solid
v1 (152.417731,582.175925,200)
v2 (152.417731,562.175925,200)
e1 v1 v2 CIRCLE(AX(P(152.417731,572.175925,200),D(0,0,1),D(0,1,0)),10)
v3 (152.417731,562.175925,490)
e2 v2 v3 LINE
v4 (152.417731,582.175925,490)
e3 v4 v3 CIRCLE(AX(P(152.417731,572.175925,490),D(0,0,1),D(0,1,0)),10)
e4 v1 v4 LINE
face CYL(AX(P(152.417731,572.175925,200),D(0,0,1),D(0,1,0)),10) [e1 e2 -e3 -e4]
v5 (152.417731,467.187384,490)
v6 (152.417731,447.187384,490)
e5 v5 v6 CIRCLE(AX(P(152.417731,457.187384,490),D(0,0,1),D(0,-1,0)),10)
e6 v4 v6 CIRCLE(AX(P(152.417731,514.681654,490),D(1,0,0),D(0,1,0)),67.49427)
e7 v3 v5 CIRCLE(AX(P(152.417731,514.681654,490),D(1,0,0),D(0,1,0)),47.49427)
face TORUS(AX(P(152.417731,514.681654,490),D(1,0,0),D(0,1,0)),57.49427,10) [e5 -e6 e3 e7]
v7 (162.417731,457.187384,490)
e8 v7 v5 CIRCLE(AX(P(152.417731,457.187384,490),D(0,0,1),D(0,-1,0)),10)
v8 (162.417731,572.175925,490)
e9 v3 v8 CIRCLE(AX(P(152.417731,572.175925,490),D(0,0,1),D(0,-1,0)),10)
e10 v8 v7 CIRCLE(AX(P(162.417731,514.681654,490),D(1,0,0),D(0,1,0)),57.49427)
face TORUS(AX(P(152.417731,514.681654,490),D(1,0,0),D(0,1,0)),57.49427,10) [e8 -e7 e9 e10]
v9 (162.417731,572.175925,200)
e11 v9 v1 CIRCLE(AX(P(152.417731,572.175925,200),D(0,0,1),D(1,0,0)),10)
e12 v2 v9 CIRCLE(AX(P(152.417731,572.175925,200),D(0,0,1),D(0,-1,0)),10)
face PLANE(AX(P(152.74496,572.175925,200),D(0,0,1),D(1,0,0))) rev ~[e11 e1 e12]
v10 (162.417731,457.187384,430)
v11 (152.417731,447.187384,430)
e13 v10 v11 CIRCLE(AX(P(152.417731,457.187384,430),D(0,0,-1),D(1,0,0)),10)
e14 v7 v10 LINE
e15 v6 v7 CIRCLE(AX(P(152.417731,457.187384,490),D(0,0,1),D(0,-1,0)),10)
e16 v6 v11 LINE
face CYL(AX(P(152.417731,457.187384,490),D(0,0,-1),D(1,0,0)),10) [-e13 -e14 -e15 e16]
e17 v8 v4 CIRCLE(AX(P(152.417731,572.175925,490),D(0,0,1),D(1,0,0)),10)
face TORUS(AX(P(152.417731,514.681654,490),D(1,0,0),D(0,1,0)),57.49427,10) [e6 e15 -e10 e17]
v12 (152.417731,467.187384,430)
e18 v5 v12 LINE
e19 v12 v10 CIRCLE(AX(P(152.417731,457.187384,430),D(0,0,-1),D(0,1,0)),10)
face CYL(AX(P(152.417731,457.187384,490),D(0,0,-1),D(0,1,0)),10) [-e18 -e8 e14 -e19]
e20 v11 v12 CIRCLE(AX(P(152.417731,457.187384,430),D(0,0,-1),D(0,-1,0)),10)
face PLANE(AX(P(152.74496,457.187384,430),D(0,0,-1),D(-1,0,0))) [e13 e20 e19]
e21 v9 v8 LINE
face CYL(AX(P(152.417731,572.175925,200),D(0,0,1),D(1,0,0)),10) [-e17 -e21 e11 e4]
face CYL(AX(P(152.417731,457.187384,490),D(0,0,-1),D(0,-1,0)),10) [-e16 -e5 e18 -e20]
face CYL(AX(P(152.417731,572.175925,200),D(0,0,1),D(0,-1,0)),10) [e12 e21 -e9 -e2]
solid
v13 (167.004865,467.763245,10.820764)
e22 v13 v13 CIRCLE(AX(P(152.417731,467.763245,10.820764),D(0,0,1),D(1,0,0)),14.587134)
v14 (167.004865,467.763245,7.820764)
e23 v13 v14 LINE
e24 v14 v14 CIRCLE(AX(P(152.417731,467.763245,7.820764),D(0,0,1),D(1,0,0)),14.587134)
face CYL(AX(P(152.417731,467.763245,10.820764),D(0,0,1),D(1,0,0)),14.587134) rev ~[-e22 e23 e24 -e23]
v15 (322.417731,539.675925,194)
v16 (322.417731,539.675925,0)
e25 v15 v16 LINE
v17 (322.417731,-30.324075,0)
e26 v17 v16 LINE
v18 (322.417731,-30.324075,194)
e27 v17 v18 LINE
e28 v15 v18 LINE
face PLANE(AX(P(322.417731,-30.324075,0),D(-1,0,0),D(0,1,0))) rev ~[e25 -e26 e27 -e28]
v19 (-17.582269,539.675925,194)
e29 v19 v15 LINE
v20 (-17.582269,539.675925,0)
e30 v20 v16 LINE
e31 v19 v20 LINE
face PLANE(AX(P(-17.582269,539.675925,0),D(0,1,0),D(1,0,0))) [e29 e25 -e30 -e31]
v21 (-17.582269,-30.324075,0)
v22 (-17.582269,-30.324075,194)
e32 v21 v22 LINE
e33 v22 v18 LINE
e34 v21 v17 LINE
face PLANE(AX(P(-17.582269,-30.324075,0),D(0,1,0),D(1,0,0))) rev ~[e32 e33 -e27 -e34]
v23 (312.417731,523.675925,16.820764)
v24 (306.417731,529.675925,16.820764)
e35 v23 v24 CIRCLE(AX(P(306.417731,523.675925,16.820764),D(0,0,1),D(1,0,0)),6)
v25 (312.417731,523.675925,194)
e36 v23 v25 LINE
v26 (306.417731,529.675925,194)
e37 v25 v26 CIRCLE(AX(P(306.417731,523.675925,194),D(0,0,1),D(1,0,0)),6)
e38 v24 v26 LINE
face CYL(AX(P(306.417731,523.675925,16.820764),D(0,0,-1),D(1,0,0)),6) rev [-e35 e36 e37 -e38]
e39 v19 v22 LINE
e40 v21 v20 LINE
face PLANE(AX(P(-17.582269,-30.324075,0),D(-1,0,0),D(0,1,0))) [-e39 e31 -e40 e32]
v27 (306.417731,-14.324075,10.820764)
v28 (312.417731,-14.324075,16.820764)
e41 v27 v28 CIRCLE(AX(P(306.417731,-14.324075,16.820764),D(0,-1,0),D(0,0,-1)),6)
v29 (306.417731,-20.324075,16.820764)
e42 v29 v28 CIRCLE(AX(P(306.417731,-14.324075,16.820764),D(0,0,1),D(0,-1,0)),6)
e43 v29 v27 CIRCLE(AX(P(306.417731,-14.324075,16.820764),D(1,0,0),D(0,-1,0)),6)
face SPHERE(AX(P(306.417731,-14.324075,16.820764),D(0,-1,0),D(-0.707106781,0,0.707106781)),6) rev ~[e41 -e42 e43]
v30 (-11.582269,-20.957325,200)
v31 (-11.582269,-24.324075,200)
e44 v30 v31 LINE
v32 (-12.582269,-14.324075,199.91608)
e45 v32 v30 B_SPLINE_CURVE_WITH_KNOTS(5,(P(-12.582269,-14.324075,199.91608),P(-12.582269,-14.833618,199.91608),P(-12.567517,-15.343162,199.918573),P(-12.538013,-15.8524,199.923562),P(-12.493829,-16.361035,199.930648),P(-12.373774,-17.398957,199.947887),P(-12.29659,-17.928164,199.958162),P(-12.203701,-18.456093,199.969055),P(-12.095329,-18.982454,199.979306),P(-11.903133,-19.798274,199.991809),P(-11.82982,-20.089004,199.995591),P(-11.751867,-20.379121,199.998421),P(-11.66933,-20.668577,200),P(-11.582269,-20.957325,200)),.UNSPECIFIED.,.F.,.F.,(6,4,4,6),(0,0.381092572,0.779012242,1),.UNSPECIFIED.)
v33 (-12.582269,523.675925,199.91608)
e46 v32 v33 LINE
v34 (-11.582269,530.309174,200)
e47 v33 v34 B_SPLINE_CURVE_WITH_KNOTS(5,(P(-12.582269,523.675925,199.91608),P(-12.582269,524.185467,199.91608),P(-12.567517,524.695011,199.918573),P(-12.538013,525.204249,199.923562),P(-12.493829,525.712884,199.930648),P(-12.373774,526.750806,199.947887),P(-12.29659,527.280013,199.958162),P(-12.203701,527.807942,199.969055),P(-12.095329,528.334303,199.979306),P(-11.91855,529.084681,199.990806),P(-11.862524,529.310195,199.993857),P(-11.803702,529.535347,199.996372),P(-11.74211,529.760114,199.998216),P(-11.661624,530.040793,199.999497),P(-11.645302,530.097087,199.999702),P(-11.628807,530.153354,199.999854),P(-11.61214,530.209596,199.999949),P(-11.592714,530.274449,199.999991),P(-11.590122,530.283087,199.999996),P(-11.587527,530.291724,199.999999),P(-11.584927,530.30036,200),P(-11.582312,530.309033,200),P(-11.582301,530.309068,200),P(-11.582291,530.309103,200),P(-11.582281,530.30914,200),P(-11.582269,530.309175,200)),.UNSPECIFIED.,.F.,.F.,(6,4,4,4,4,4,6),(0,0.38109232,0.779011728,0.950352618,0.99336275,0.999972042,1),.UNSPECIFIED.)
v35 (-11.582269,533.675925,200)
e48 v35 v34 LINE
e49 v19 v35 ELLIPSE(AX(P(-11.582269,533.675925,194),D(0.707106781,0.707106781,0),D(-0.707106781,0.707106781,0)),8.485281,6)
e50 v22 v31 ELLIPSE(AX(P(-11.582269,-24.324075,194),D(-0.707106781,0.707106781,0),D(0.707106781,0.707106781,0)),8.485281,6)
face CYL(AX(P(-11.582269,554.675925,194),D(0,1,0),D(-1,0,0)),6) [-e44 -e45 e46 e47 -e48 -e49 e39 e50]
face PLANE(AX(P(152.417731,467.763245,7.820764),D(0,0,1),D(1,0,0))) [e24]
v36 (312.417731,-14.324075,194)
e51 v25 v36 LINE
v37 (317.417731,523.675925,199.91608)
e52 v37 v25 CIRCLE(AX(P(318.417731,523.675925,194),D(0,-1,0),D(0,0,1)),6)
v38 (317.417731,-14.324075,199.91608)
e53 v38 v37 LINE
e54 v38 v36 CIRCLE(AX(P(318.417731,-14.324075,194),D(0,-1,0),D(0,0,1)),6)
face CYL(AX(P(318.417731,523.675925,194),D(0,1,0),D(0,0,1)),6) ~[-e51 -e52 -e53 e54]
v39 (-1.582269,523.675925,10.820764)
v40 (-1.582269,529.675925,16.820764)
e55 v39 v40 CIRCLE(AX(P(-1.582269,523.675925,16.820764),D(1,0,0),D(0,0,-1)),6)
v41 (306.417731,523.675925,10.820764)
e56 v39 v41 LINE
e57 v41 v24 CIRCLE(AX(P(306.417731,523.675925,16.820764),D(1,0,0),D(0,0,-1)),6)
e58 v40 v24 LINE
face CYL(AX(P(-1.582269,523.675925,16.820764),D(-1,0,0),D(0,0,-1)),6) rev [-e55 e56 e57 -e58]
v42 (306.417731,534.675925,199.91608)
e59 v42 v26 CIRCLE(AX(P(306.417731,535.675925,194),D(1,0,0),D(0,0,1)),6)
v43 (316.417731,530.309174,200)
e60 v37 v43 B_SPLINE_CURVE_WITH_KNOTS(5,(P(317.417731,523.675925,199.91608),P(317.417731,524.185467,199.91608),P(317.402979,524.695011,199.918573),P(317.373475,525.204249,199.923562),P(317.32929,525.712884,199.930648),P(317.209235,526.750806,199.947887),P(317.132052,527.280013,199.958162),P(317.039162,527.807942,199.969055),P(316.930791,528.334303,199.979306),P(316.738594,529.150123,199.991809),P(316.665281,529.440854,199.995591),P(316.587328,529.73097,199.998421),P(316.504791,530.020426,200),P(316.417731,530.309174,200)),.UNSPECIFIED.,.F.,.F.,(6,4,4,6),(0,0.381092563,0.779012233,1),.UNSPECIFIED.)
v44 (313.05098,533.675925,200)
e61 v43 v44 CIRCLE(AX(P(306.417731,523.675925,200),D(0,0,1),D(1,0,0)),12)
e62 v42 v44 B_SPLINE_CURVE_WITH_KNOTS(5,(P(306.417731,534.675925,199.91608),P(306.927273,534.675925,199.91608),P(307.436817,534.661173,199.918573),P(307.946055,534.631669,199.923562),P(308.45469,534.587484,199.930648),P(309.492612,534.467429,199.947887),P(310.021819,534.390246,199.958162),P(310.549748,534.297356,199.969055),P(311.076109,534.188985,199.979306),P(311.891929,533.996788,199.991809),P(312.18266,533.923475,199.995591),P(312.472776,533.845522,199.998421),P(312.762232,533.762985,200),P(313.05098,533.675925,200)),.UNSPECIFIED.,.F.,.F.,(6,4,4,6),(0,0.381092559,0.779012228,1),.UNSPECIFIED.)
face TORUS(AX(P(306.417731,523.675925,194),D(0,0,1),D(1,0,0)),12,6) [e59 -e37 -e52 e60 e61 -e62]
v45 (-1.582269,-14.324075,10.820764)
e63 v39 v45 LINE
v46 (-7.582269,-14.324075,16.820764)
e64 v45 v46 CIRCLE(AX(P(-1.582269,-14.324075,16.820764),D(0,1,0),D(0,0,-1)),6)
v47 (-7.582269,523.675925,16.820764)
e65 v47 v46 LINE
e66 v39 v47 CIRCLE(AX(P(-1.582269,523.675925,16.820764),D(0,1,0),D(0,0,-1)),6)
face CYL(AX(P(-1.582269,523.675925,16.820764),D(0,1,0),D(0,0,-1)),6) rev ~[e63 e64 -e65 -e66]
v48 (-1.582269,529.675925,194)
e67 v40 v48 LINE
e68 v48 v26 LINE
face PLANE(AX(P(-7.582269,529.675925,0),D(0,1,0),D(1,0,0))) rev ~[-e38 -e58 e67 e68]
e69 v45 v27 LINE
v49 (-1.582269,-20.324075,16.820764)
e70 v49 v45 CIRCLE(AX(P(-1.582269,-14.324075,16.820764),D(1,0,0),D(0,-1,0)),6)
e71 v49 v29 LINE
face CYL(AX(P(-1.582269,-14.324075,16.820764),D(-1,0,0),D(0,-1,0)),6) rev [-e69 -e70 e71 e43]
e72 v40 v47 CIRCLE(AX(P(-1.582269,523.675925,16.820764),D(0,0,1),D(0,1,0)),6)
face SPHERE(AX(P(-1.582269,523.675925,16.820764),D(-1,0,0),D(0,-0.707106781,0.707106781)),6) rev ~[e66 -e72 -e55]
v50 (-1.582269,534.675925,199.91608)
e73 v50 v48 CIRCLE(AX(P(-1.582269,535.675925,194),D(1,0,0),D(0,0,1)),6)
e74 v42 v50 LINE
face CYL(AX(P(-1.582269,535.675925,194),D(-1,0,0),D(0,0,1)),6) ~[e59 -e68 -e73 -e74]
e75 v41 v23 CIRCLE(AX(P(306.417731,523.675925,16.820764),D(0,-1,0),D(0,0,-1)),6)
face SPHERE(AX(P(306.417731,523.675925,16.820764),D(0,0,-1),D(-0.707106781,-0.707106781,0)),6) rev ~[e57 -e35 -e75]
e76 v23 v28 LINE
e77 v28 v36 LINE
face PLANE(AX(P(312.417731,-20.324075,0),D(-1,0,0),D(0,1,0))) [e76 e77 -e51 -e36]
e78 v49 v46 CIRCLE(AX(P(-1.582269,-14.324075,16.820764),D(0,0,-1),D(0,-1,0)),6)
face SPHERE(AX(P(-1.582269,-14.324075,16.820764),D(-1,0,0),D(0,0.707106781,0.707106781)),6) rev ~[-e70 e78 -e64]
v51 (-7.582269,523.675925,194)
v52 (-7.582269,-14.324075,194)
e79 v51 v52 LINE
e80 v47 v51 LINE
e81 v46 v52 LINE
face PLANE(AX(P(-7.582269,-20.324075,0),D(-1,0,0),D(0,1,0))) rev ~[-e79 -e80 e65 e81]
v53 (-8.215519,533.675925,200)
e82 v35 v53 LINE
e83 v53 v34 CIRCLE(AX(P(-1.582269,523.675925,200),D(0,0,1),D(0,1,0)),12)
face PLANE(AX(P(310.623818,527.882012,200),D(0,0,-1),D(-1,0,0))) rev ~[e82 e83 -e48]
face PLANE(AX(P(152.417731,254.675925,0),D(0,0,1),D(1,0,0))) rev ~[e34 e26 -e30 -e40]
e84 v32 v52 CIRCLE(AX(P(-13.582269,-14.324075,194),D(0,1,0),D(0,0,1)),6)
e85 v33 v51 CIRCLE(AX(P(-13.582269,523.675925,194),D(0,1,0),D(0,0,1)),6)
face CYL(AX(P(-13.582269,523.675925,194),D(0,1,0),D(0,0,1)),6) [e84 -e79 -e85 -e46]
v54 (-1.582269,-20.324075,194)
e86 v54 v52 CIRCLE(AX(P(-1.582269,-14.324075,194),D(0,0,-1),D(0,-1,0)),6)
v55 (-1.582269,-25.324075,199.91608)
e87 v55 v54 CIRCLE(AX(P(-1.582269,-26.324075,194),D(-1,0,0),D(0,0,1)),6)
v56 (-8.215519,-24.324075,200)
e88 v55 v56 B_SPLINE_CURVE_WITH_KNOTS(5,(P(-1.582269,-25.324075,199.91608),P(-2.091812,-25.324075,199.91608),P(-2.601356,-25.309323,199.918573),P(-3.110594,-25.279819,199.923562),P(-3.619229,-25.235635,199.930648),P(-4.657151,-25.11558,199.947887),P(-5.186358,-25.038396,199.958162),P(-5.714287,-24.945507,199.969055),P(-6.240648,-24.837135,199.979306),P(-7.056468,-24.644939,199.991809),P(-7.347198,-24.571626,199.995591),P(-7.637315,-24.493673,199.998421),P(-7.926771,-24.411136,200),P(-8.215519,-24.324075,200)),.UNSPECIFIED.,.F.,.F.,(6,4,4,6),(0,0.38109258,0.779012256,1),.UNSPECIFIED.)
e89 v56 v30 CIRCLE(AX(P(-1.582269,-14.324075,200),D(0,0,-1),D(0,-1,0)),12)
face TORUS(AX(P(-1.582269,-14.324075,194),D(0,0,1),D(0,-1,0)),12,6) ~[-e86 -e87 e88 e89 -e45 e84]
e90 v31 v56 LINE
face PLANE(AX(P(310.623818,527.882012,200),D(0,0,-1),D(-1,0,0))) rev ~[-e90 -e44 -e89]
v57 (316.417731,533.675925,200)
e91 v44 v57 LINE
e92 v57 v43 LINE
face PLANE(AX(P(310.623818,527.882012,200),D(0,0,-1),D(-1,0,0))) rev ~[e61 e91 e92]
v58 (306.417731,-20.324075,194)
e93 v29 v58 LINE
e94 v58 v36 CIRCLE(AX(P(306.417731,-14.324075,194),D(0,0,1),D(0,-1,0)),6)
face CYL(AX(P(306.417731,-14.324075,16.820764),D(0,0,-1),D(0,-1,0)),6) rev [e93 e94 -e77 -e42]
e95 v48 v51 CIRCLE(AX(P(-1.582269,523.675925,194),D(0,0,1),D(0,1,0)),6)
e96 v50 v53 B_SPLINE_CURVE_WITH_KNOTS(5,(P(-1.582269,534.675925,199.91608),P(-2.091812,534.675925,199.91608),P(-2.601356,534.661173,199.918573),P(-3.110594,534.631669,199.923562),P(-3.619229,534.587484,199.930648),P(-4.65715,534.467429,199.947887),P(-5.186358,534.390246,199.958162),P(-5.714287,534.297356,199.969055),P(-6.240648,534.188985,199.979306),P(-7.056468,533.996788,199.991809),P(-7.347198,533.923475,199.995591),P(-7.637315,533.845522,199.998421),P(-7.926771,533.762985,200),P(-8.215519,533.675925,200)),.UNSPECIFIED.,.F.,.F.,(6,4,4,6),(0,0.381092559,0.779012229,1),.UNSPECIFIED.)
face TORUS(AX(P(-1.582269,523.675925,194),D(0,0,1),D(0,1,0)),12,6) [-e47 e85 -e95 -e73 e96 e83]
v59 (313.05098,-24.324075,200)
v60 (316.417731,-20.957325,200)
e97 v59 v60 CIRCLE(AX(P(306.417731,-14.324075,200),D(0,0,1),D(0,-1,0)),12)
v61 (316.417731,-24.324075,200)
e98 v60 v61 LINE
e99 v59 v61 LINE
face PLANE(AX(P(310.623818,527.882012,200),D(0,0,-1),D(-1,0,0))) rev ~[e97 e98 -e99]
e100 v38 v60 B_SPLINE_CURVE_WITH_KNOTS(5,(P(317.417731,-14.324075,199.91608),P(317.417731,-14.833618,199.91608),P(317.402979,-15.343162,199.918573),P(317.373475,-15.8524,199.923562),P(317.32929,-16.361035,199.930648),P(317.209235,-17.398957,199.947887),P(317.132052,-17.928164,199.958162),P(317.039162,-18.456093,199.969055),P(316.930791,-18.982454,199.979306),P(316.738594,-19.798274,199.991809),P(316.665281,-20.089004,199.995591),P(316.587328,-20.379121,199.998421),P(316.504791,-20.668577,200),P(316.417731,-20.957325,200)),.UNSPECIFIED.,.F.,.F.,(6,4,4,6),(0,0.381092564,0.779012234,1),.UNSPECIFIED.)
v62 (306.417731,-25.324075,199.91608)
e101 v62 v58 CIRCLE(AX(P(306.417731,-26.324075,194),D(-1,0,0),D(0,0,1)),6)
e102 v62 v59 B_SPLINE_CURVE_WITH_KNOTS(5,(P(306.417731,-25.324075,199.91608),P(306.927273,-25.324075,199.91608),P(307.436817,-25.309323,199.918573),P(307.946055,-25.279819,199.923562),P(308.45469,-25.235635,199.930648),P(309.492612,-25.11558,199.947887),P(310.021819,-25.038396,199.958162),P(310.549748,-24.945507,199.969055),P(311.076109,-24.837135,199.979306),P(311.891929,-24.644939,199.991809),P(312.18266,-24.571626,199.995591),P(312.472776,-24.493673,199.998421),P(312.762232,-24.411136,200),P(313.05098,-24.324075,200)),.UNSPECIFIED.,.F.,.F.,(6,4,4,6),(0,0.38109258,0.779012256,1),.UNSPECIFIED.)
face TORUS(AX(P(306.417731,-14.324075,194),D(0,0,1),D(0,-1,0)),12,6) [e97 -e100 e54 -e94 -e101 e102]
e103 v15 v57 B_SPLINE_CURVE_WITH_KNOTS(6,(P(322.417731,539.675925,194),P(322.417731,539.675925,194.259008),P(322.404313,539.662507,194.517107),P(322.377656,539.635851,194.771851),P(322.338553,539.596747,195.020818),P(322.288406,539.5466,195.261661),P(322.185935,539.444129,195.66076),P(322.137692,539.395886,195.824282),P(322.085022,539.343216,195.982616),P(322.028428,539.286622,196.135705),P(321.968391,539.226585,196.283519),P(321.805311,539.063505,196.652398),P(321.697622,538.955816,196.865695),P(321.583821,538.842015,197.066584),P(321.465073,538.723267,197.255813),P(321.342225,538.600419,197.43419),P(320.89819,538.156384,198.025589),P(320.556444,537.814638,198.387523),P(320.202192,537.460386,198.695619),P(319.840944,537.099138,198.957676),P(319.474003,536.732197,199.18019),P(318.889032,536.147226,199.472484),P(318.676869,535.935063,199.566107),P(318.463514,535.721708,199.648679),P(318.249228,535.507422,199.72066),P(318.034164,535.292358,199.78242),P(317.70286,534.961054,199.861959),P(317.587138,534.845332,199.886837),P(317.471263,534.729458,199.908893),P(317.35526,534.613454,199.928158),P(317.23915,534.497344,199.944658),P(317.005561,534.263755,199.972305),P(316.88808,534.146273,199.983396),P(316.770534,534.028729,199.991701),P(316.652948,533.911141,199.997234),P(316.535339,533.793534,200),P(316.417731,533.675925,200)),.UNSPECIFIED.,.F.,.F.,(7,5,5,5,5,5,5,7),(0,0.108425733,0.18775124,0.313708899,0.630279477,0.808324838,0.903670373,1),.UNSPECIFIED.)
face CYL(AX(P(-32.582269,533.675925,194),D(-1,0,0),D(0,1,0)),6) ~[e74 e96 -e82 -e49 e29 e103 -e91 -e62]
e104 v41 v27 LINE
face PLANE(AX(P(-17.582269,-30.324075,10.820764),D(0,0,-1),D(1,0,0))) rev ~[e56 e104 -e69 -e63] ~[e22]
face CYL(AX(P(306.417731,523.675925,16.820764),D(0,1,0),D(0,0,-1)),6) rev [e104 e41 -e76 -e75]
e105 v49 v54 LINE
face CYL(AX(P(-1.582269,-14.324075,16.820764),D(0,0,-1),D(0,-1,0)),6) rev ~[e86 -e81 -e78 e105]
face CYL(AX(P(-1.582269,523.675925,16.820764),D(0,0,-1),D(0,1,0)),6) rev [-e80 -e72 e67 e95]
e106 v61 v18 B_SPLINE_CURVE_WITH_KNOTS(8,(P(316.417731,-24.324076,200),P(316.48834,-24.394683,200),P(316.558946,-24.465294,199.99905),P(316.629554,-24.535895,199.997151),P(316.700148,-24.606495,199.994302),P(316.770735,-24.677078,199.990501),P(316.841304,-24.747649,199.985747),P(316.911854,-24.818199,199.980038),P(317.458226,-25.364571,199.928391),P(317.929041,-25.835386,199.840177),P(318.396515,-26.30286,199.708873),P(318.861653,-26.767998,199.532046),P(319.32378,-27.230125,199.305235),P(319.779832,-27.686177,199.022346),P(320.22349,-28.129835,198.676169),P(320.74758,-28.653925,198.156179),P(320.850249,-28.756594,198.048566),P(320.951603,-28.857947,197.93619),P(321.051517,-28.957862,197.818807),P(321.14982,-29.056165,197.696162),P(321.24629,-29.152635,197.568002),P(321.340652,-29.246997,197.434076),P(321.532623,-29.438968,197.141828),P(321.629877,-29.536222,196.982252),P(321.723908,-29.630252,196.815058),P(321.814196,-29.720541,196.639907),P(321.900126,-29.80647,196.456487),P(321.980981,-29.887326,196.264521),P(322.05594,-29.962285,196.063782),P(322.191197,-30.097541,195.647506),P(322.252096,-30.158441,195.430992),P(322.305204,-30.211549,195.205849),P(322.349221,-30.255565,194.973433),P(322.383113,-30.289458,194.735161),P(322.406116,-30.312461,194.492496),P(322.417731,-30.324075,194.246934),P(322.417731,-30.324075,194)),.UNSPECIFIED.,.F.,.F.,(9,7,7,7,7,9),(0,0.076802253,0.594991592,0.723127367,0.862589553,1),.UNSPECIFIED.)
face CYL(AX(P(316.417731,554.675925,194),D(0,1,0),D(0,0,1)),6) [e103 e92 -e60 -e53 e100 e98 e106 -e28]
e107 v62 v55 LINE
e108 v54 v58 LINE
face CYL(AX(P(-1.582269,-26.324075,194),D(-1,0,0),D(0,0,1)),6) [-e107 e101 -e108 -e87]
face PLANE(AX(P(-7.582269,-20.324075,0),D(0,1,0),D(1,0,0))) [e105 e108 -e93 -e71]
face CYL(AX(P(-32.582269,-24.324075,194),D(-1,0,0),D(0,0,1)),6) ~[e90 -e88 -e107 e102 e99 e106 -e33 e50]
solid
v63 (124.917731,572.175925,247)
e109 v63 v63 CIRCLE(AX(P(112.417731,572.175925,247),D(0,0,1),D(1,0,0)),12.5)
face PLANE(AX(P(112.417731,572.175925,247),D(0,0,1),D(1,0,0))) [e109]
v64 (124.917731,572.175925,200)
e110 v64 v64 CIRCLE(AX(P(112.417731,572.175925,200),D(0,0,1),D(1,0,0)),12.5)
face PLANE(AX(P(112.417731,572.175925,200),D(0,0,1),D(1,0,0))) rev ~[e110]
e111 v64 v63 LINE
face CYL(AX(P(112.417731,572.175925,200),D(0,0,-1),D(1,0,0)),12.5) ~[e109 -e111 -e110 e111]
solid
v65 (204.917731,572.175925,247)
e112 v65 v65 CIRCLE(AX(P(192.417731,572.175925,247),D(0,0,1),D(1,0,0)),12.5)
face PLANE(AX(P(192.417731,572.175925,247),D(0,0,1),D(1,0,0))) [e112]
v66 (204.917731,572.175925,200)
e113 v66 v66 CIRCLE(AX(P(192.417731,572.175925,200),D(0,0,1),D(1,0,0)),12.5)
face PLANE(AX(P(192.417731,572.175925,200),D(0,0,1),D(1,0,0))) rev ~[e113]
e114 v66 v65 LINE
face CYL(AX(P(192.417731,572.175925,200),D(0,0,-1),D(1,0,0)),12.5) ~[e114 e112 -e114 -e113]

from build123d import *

# Parameters (mm, degrees)
F0_W         = 340
F0_H         = 570
F0_W_2       = 320
F0_H_2       = 550
F1_DEPTH     = 200
F2_W         = 340
F2_H         = 10.8207641169
F3_DEPTH     = 570
F4_T1_DEPTH  = 538
F4_T3_DEPTH  = 308
F4_T5_DEPTH  = 183.1792358831
F4_S9_W      = 6.12
F4_S9_H      = 6.12
F4_T10_DEPTH = 6.12
F4_S15_W     = 6.12
F4_S15_H     = 6.12
F4_T16_DEPTH = 6.12
F4_S21_W     = 6.12
F4_S21_H     = 6.12
F4_T22_DEPTH = 6.12
F4_S27_W     = 6.12
F4_S27_H     = 6.12
F4_T28_DEPTH = 6.12
F4_T31_DEPTH = 600
F4_T33_DEPTH = 370
F4_T35_DEPTH = 538
F4_T37_DEPTH = 308
F4_T40_ANGLE = 90
F4_T42_ANGLE = 90
F4_T44_ANGLE = 90
F4_T46_ANGLE = 90
F5_R         = 14.5871340725
F6_DEPTH     = 3
F12_R        = 12.5
F13_DEPTH    = 47


# Not quite as in the source:
# - a fillet or chamfer that OpenCascade refuses, or shapes differently, is made with other operations: its cross-section is extruded or revolved along the edge and cut away or added


with BuildPart() as f1:
    # F0 (on Top) → F1 (new body)
    with BuildSketch(Plane.XY):
        with Locations((152.4177306145, 254.675924629)):
            Rectangle(F0_W, F0_H)
        with Locations((152.4177306145, 254.675924629)):
            Rectangle(F0_W_2, F0_H_2, mode=Mode.SUBTRACT)
    extrude(amount=F1_DEPTH)

    # F2 (on face) → F3 (join, through all)
    with BuildSketch(Plane.XZ.offset(30.324075371)):
        with Locations((152.4177306145, 5.4103820585)):
            Rectangle(F2_W, F2_H)
    extrude(amount=-F3_DEPTH)

    # F4: fillet of radius 6 on 16 edges, made by hand

    # F4_s2 → F4_t1 (join)
    with BuildSketch(Plane.XZ.offset(-523.675924629)):
        with BuildLine():
            ThreePointArc((-1.5822693855, 10.8207641169), (-5.8249100726, 12.5781234298), (-7.5822693855, 16.8207641169))
            Line((-7.5822693855, 16.8207641169), (-7.7022693855, 16.8207641169))
            Line((-7.7022693855, 16.8207641169), (-7.7022693855, 10.7007641169))
            Line((-7.7022693855, 10.7007641169), (-1.5822693855, 10.7007641169))
            Line((-1.5822693855, 10.7007641169), (-1.5822693855, 10.8207641169))
        make_face()
        with BuildLine():
            ThreePointArc((306.4177306145, 10.8207641169), (310.6603713017, 12.5781234298), (312.4177306145, 16.8207641169))
            Line((312.4177306145, 16.8207641169), (312.5377306145, 16.8207641169))
            Line((312.5377306145, 16.8207641169), (312.5377306145, 10.7007641169))
            Line((312.5377306145, 10.7007641169), (306.4177306145, 10.7007641169))
            Line((306.4177306145, 10.7007641169), (306.4177306145, 10.8207641169))
        make_face()
    extrude(amount=F4_T1_DEPTH)

    # F4_s4 → F4_t3 (join)
    with BuildSketch(Plane.YZ.offset(-1.5822693855)):
        with BuildLine():
            ThreePointArc((523.675924629, 10.8207641169), (527.9185653161, 12.5781234298), (529.675924629, 16.8207641169))
            Line((529.675924629, 16.8207641169), (529.795924629, 16.8207641169))
            Line((529.795924629, 16.8207641169), (529.795924629, 10.7007641169))
            Line((529.795924629, 10.7007641169), (523.675924629, 10.7007641169))
            Line((523.675924629, 10.7007641169), (523.675924629, 10.8207641169))
        make_face()
        with BuildLine():
            ThreePointArc((-20.324075371, 16.8207641169), (-18.5667160581, 12.5781234298), (-14.324075371, 10.8207641169))
            Line((-14.324075371, 10.8207641169), (-14.324075371, 10.7007641169))
            Line((-14.324075371, 10.7007641169), (-20.444075371, 10.7007641169))
            Line((-20.444075371, 10.7007641169), (-20.444075371, 16.8207641169))
            Line((-20.444075371, 16.8207641169), (-20.324075371, 16.8207641169))
        make_face()
    extrude(amount=F4_T3_DEPTH)

    # F4_s6 → F4_t5 (join)
    with BuildSketch(Plane.XY.offset(16.8207641169)):
        with BuildLine():
            ThreePointArc((312.4177306145, 523.675924629), (310.6603713017, 527.9185653161), (306.4177306145, 529.675924629))
            Line((306.4177306145, 529.675924629), (306.4177306145, 529.795924629))
            Line((306.4177306145, 529.795924629), (312.5377306145, 529.795924629))
            Line((312.5377306145, 529.795924629), (312.5377306145, 523.675924629))
            Line((312.5377306145, 523.675924629), (312.4177306145, 523.675924629))
        make_face()
        with BuildLine():
            ThreePointArc((-1.5822693855, 529.675924629), (-5.8249100726, 527.9185653161), (-7.5822693855, 523.675924629))
            Line((-7.5822693855, 523.675924629), (-7.7022693855, 523.675924629))
            Line((-7.7022693855, 523.675924629), (-7.7022693855, 529.795924629))
            Line((-7.7022693855, 529.795924629), (-1.5822693855, 529.795924629))
            Line((-1.5822693855, 529.795924629), (-1.5822693855, 529.675924629))
        make_face()
        with BuildLine():
            ThreePointArc((-1.5822693855, -20.324075371), (-5.8249100726, -18.5667160581), (-7.5822693855, -14.324075371))
            Line((-7.5822693855, -14.324075371), (-7.7022693855, -14.324075371))
            Line((-7.7022693855, -14.324075371), (-7.7022693855, -20.444075371))
            Line((-7.7022693855, -20.444075371), (-1.5822693855, -20.444075371))
            Line((-1.5822693855, -20.444075371), (-1.5822693855, -20.324075371))
        make_face()
        with BuildLine():
            ThreePointArc((306.4177306145, -20.324075371), (310.6603713017, -18.5667160581), (312.4177306145, -14.324075371))
            Line((312.4177306145, -14.324075371), (312.5377306145, -14.324075371))
            Line((312.5377306145, -14.324075371), (312.5377306145, -20.444075371))
            Line((312.5377306145, -20.444075371), (306.4177306145, -20.444075371))
            Line((306.4177306145, -20.444075371), (306.4177306145, -20.324075371))
        make_face()
    extrude(amount=F4_T5_DEPTH)


with BuildPart() as f4_tool8:
    # F4_s9 → F4_t10 (new body)
    with BuildSketch(Plane.YZ.offset(-1.5822693855)):
        with Locations((-17.384075371, 13.7607641169)):
            Rectangle(F4_S9_W, F4_S9_H)
    extrude(amount=-F4_T10_DEPTH)

    # F4_s11 → F4_t12 (revolve, cut)
    with BuildSketch(Plane(origin=(-1.5822693855, -14.324075371, 16.8207641169), x_dir=(0, 0.7071067812, 0.7071067812), z_dir=(0, -0.7071067812, 0.7071067812))):
        with BuildLine():
            ThreePointArc((0, -6), (6, 0), (0, 6))
            Line((0, 6), (0, -6))
        make_face()
    revolve(axis=Axis((-1.5822693855, -14.324075371, 16.8207641169), (-1, 0, 0)), mode=Mode.SUBTRACT)


with BuildPart() as f1_1:
    add(f1.part)

    # F4_t7: union F4_tool8
    add(f4_tool8.part)


with BuildPart() as f4_tool14:
    # F4_s15 → F4_t16 (new body)
    with BuildSketch(Plane.YZ.offset(-1.5822693855)):
        with Locations((526.735924629, 13.7607641169)):
            Rectangle(F4_S15_W, F4_S15_H)
    extrude(amount=-F4_T16_DEPTH)

    # F4_s17 → F4_t18 (revolve, cut)
    with BuildSketch(Plane(origin=(-1.5822693855, 523.675924629, 16.8207641169), x_dir=(0, -0.7071067812, 0.7071067812), z_dir=(0, -0.7071067812, -0.7071067812))):
        with BuildLine():
            ThreePointArc((0, -6), (6, 0), (0, 6))
            Line((0, 6), (0, -6))
        make_face()
    revolve(axis=Axis((-1.5822693855, 523.675924629, 16.8207641169), (-1, 0, 0)), mode=Mode.SUBTRACT)


with BuildPart() as f1_2:
    add(f1_1.part)

    # F4_t13: union F4_tool14
    add(f4_tool14.part)


with BuildPart() as f4_tool20:
    # F4_s21 → F4_t22 (new body)
    with BuildSketch(Plane.XY.offset(16.8207641169)):
        with Locations((309.4777306145, 526.735924629)):
            Rectangle(F4_S21_W, F4_S21_H)
    extrude(amount=-F4_T22_DEPTH)

    # F4_s23 → F4_t24 (revolve, cut)
    with BuildSketch(Plane(origin=(306.4177306145, 523.675924629, 16.8207641169), x_dir=(-0.7071067812, -0.7071067812, 0), z_dir=(0.7071067812, -0.7071067812, 0))):
        with BuildLine():
            ThreePointArc((0, -6), (6, 0), (0, 6))
            Line((0, 6), (0, -6))
        make_face()
    revolve(axis=Axis((306.4177306145, 523.675924629, 16.8207641169), (0, 0, -1)), mode=Mode.SUBTRACT)


with BuildPart() as f1_3:
    add(f1_2.part)

    # F4_t19: union F4_tool20
    add(f4_tool20.part)


with BuildPart() as f4_tool26:
    # F4_s27 → F4_t28 (new body)
    with BuildSketch(Plane.XZ.offset(14.324075371)):
        with Locations((309.4777306145, 13.7607641169)):
            Rectangle(F4_S27_W, F4_S27_H)
    extrude(amount=F4_T28_DEPTH)

    # F4_s29 → F4_t30 (revolve, cut)
    with BuildSketch(Plane(origin=(306.4177306145, -14.324075371, 16.8207641169), x_dir=(-0.7071067812, 0, 0.7071067812), z_dir=(0.7071067812, 0, 0.7071067812))):
        with BuildLine():
            ThreePointArc((0, -6), (6, 0), (0, 6))
            Line((0, 6), (0, -6))
        make_face()
    revolve(axis=Axis((306.4177306145, -14.324075371, 16.8207641169), (0, -1, 0)), mode=Mode.SUBTRACT)


with BuildPart() as f1_4:
    add(f1_3.part)

    # F4_t25: union F4_tool26
    add(f4_tool26.part)

    # F4_s32 → F4_t31 (cut)
    with BuildSketch(Plane.XZ.offset(-554.675924629)):
        with BuildLine():
            ThreePointArc((-17.5822693855, 194), (-15.8249100726, 198.2426406871), (-11.5822693855, 200))
            Line((-11.5822693855, 200), (-11.5822693855, 200.12))
            Line((-11.5822693855, 200.12), (-17.7022693855, 200.12))
            Line((-17.7022693855, 200.12), (-17.7022693855, 194))
            Line((-17.7022693855, 194), (-17.5822693855, 194))
        make_face()
        with BuildLine():
            ThreePointArc((316.4177306145, 200), (320.6603713017, 198.2426406871), (322.4177306145, 194))
            Line((322.4177306145, 194), (322.5377306145, 194))
            Line((322.5377306145, 194), (322.5377306145, 200.12))
            Line((322.5377306145, 200.12), (316.4177306145, 200.12))
            Line((316.4177306145, 200.12), (316.4177306145, 200))
        make_face()
    extrude(amount=F4_T31_DEPTH, mode=Mode.SUBTRACT)

    # F4_s34 → F4_t33 (cut)
    with BuildSketch(Plane.YZ.offset(-32.5822693855)):
        with BuildLine():
            ThreePointArc((-24.324075371, 200), (-28.5667160581, 198.2426406871), (-30.324075371, 194))
            Line((-30.324075371, 194), (-30.444075371, 194))
            Line((-30.444075371, 194), (-30.444075371, 200.12))
            Line((-30.444075371, 200.12), (-24.324075371, 200.12))
            Line((-24.324075371, 200.12), (-24.324075371, 200))
        make_face()
        with BuildLine():
            ThreePointArc((539.675924629, 194), (537.9185653161, 198.2426406871), (533.675924629, 200))
            Line((533.675924629, 200), (533.675924629, 200.12))
            Line((533.675924629, 200.12), (539.795924629, 200.12))
            Line((539.795924629, 200.12), (539.795924629, 194))
            Line((539.795924629, 194), (539.675924629, 194))
        make_face()
    extrude(amount=F4_T33_DEPTH, mode=Mode.SUBTRACT)

    # F4_s36 → F4_t35 (cut)
    with BuildSketch(Plane.XZ.offset(-523.675924629)):
        with BuildLine():
            ThreePointArc((-13.5822693855, 200), (-9.3396286983, 198.2426406871), (-7.5822693855, 194))
            Line((-7.5822693855, 194), (-7.4622693855, 194))
            Line((-7.4622693855, 194), (-7.4622693855, 200.12))
            Line((-7.4622693855, 200.12), (-13.5822693855, 200.12))
            Line((-13.5822693855, 200.12), (-13.5822693855, 200))
        make_face()
        with BuildLine():
            ThreePointArc((318.4177306145, 200), (314.1750899274, 198.2426406871), (312.4177306145, 194))
            Line((312.4177306145, 194), (312.2977306145, 194))
            Line((312.2977306145, 194), (312.2977306145, 200.12))
            Line((312.2977306145, 200.12), (318.4177306145, 200.12))
            Line((318.4177306145, 200.12), (318.4177306145, 200))
        make_face()
    extrude(amount=F4_T35_DEPTH, mode=Mode.SUBTRACT)

    # F4_s38 → F4_t37 (cut)
    with BuildSketch(Plane.YZ.offset(-1.5822693855)):
        with BuildLine():
            ThreePointArc((535.675924629, 200), (531.4332839419, 198.2426406871), (529.675924629, 194))
            Line((529.675924629, 194), (529.555924629, 194))
            Line((529.555924629, 194), (529.555924629, 200.12))
            Line((529.555924629, 200.12), (535.675924629, 200.12))
            Line((535.675924629, 200.12), (535.675924629, 200))
        make_face()
        with BuildLine():
            ThreePointArc((-26.324075371, 200), (-22.0814346839, 198.2426406871), (-20.324075371, 194))
            Line((-20.324075371, 194), (-20.204075371, 194))
            Line((-20.204075371, 194), (-20.204075371, 200.12))
            Line((-20.204075371, 200.12), (-26.324075371, 200.12))
            Line((-26.324075371, 200.12), (-26.324075371, 200))
        make_face()
    extrude(amount=F4_T37_DEPTH, mode=Mode.SUBTRACT)

    # F4_s39 → F4_t40 (revolve, cut)
    with BuildSketch(Plane.YZ.offset(306.4177306145)):
        with BuildLine():
            ThreePointArc((-26.324075371, 200), (-22.0814346839, 198.2426406871), (-20.324075371, 194))
            Line((-20.324075371, 194), (-20.204075371, 194))
            Line((-20.204075371, 194), (-20.204075371, 200.12))
            Line((-20.204075371, 200.12), (-26.324075371, 200.12))
            Line((-26.324075371, 200.12), (-26.324075371, 200))
        make_face()
    revolve(axis=Axis((306.4177306145, -14.324075371, 200), (0, 0, 1)), revolution_arc=F4_T40_ANGLE, mode=Mode.SUBTRACT)

    # F4_s41 → F4_t42 (revolve, cut)
    with BuildSketch(Plane.YZ.offset(-1.5822693855)):
        with BuildLine():
            ThreePointArc((-26.324075371, 200), (-22.0814346839, 198.2426406871), (-20.324075371, 194))
            Line((-20.324075371, 194), (-20.204075371, 194))
            Line((-20.204075371, 194), (-20.204075371, 200.12))
            Line((-20.204075371, 200.12), (-26.324075371, 200.12))
            Line((-26.324075371, 200.12), (-26.324075371, 200))
        make_face()
    revolve(axis=Axis((-1.5822693855, -14.324075371, 200), (0, 0, -1)), revolution_arc=F4_T42_ANGLE, mode=Mode.SUBTRACT)

    # F4_s43 → F4_t44 (revolve, cut)
    with BuildSketch(Plane.XZ.offset(-523.675924629)):
        with BuildLine():
            ThreePointArc((318.4177306145, 200), (314.1750899274, 198.2426406871), (312.4177306145, 194))
            Line((312.4177306145, 194), (312.2977306145, 194))
            Line((312.2977306145, 194), (312.2977306145, 200.12))
            Line((312.2977306145, 200.12), (318.4177306145, 200.12))
            Line((318.4177306145, 200.12), (318.4177306145, 200))
        make_face()
    revolve(axis=Axis((306.4177306145, 523.675924629, 200), (0, 0, 1)), revolution_arc=F4_T44_ANGLE, mode=Mode.SUBTRACT)

    # F4_s45 → F4_t46 (revolve, cut)
    with BuildSketch(Plane.YZ.offset(-1.5822693855)):
        with BuildLine():
            ThreePointArc((535.675924629, 200), (531.4332839419, 198.2426406871), (529.675924629, 194))
            Line((529.675924629, 194), (529.555924629, 194))
            Line((529.555924629, 194), (529.555924629, 200.12))
            Line((529.555924629, 200.12), (535.675924629, 200.12))
            Line((535.675924629, 200.12), (535.675924629, 200))
        make_face()
    revolve(axis=Axis((-1.5822693855, 523.675924629, 200), (0, 0, 1)), revolution_arc=F4_T46_ANGLE, mode=Mode.SUBTRACT)

    # F5 (on face) → F6 (cut)
    with BuildSketch(Plane.XY.offset(10.8207641169)):
        with Locations((152.4177306145, 467.7632451057)):
            Circle(F5_R)
    extrude(amount=-F6_DEPTH, mode=Mode.SUBTRACT)


with BuildPart() as f11:
    # F11: sweep along a path in F10
    with BuildLine(Plane.YZ.offset(152.4177306145)) as f11_path:
        Line((572.175924629, 200), (572.175924629, 430))
        Line((572.175924629, 430), (572.175924629, 490))
        ThreePointArc((572.175924629, 490), (514.681654498, 547.494270131), (457.187384367, 490))
        Line((457.187384367, 490), (457.187384367, 430))
    # F8 (on offset) → F11 (sweep)
    with BuildSketch(Plane.XY.offset(200)):
        with BuildLine():
            ThreePointArc((152.4177306145, 582.175924629), (142.4177306145, 572.175924629), (152.4177306145, 562.175924629))
            Line((152.4177306145, 562.175924629), (152.4177306145, 582.175924629))
        make_face()
        with BuildLine():
            Line((152.4177306145, 582.175924629), (152.4177306145, 562.175924629))
            ThreePointArc((152.4177306145, 562.175924629), (159.4887984264, 565.1048568171), (162.4177306145, 572.175924629))
            ThreePointArc((162.4177306145, 572.175924629), (159.4887984264, 579.2469924408), (152.4177306145, 582.175924629))
        make_face()
    sweep(path=f11_path.line)


with BuildPart() as f13:
    # F12 (on offset) → F13 (new body)
    with BuildSketch(Plane.XY.offset(200)):
        with Locations((112.4177306145, 572.175924629)):
            Circle(F12_R)
    extrude(amount=F13_DEPTH)


with BuildPart() as f13b:
    # F12 (on offset) → F13, piece 2 (new body)
    with BuildSketch(Plane.XY.offset(200)):
        with Locations((192.4177306145, 572.175924629)):
            Circle(F12_R)
    extrude(amount=F13_DEPTH)


solid = Compound([f1_4.part, f11.part, f13.part, f13b.part])
